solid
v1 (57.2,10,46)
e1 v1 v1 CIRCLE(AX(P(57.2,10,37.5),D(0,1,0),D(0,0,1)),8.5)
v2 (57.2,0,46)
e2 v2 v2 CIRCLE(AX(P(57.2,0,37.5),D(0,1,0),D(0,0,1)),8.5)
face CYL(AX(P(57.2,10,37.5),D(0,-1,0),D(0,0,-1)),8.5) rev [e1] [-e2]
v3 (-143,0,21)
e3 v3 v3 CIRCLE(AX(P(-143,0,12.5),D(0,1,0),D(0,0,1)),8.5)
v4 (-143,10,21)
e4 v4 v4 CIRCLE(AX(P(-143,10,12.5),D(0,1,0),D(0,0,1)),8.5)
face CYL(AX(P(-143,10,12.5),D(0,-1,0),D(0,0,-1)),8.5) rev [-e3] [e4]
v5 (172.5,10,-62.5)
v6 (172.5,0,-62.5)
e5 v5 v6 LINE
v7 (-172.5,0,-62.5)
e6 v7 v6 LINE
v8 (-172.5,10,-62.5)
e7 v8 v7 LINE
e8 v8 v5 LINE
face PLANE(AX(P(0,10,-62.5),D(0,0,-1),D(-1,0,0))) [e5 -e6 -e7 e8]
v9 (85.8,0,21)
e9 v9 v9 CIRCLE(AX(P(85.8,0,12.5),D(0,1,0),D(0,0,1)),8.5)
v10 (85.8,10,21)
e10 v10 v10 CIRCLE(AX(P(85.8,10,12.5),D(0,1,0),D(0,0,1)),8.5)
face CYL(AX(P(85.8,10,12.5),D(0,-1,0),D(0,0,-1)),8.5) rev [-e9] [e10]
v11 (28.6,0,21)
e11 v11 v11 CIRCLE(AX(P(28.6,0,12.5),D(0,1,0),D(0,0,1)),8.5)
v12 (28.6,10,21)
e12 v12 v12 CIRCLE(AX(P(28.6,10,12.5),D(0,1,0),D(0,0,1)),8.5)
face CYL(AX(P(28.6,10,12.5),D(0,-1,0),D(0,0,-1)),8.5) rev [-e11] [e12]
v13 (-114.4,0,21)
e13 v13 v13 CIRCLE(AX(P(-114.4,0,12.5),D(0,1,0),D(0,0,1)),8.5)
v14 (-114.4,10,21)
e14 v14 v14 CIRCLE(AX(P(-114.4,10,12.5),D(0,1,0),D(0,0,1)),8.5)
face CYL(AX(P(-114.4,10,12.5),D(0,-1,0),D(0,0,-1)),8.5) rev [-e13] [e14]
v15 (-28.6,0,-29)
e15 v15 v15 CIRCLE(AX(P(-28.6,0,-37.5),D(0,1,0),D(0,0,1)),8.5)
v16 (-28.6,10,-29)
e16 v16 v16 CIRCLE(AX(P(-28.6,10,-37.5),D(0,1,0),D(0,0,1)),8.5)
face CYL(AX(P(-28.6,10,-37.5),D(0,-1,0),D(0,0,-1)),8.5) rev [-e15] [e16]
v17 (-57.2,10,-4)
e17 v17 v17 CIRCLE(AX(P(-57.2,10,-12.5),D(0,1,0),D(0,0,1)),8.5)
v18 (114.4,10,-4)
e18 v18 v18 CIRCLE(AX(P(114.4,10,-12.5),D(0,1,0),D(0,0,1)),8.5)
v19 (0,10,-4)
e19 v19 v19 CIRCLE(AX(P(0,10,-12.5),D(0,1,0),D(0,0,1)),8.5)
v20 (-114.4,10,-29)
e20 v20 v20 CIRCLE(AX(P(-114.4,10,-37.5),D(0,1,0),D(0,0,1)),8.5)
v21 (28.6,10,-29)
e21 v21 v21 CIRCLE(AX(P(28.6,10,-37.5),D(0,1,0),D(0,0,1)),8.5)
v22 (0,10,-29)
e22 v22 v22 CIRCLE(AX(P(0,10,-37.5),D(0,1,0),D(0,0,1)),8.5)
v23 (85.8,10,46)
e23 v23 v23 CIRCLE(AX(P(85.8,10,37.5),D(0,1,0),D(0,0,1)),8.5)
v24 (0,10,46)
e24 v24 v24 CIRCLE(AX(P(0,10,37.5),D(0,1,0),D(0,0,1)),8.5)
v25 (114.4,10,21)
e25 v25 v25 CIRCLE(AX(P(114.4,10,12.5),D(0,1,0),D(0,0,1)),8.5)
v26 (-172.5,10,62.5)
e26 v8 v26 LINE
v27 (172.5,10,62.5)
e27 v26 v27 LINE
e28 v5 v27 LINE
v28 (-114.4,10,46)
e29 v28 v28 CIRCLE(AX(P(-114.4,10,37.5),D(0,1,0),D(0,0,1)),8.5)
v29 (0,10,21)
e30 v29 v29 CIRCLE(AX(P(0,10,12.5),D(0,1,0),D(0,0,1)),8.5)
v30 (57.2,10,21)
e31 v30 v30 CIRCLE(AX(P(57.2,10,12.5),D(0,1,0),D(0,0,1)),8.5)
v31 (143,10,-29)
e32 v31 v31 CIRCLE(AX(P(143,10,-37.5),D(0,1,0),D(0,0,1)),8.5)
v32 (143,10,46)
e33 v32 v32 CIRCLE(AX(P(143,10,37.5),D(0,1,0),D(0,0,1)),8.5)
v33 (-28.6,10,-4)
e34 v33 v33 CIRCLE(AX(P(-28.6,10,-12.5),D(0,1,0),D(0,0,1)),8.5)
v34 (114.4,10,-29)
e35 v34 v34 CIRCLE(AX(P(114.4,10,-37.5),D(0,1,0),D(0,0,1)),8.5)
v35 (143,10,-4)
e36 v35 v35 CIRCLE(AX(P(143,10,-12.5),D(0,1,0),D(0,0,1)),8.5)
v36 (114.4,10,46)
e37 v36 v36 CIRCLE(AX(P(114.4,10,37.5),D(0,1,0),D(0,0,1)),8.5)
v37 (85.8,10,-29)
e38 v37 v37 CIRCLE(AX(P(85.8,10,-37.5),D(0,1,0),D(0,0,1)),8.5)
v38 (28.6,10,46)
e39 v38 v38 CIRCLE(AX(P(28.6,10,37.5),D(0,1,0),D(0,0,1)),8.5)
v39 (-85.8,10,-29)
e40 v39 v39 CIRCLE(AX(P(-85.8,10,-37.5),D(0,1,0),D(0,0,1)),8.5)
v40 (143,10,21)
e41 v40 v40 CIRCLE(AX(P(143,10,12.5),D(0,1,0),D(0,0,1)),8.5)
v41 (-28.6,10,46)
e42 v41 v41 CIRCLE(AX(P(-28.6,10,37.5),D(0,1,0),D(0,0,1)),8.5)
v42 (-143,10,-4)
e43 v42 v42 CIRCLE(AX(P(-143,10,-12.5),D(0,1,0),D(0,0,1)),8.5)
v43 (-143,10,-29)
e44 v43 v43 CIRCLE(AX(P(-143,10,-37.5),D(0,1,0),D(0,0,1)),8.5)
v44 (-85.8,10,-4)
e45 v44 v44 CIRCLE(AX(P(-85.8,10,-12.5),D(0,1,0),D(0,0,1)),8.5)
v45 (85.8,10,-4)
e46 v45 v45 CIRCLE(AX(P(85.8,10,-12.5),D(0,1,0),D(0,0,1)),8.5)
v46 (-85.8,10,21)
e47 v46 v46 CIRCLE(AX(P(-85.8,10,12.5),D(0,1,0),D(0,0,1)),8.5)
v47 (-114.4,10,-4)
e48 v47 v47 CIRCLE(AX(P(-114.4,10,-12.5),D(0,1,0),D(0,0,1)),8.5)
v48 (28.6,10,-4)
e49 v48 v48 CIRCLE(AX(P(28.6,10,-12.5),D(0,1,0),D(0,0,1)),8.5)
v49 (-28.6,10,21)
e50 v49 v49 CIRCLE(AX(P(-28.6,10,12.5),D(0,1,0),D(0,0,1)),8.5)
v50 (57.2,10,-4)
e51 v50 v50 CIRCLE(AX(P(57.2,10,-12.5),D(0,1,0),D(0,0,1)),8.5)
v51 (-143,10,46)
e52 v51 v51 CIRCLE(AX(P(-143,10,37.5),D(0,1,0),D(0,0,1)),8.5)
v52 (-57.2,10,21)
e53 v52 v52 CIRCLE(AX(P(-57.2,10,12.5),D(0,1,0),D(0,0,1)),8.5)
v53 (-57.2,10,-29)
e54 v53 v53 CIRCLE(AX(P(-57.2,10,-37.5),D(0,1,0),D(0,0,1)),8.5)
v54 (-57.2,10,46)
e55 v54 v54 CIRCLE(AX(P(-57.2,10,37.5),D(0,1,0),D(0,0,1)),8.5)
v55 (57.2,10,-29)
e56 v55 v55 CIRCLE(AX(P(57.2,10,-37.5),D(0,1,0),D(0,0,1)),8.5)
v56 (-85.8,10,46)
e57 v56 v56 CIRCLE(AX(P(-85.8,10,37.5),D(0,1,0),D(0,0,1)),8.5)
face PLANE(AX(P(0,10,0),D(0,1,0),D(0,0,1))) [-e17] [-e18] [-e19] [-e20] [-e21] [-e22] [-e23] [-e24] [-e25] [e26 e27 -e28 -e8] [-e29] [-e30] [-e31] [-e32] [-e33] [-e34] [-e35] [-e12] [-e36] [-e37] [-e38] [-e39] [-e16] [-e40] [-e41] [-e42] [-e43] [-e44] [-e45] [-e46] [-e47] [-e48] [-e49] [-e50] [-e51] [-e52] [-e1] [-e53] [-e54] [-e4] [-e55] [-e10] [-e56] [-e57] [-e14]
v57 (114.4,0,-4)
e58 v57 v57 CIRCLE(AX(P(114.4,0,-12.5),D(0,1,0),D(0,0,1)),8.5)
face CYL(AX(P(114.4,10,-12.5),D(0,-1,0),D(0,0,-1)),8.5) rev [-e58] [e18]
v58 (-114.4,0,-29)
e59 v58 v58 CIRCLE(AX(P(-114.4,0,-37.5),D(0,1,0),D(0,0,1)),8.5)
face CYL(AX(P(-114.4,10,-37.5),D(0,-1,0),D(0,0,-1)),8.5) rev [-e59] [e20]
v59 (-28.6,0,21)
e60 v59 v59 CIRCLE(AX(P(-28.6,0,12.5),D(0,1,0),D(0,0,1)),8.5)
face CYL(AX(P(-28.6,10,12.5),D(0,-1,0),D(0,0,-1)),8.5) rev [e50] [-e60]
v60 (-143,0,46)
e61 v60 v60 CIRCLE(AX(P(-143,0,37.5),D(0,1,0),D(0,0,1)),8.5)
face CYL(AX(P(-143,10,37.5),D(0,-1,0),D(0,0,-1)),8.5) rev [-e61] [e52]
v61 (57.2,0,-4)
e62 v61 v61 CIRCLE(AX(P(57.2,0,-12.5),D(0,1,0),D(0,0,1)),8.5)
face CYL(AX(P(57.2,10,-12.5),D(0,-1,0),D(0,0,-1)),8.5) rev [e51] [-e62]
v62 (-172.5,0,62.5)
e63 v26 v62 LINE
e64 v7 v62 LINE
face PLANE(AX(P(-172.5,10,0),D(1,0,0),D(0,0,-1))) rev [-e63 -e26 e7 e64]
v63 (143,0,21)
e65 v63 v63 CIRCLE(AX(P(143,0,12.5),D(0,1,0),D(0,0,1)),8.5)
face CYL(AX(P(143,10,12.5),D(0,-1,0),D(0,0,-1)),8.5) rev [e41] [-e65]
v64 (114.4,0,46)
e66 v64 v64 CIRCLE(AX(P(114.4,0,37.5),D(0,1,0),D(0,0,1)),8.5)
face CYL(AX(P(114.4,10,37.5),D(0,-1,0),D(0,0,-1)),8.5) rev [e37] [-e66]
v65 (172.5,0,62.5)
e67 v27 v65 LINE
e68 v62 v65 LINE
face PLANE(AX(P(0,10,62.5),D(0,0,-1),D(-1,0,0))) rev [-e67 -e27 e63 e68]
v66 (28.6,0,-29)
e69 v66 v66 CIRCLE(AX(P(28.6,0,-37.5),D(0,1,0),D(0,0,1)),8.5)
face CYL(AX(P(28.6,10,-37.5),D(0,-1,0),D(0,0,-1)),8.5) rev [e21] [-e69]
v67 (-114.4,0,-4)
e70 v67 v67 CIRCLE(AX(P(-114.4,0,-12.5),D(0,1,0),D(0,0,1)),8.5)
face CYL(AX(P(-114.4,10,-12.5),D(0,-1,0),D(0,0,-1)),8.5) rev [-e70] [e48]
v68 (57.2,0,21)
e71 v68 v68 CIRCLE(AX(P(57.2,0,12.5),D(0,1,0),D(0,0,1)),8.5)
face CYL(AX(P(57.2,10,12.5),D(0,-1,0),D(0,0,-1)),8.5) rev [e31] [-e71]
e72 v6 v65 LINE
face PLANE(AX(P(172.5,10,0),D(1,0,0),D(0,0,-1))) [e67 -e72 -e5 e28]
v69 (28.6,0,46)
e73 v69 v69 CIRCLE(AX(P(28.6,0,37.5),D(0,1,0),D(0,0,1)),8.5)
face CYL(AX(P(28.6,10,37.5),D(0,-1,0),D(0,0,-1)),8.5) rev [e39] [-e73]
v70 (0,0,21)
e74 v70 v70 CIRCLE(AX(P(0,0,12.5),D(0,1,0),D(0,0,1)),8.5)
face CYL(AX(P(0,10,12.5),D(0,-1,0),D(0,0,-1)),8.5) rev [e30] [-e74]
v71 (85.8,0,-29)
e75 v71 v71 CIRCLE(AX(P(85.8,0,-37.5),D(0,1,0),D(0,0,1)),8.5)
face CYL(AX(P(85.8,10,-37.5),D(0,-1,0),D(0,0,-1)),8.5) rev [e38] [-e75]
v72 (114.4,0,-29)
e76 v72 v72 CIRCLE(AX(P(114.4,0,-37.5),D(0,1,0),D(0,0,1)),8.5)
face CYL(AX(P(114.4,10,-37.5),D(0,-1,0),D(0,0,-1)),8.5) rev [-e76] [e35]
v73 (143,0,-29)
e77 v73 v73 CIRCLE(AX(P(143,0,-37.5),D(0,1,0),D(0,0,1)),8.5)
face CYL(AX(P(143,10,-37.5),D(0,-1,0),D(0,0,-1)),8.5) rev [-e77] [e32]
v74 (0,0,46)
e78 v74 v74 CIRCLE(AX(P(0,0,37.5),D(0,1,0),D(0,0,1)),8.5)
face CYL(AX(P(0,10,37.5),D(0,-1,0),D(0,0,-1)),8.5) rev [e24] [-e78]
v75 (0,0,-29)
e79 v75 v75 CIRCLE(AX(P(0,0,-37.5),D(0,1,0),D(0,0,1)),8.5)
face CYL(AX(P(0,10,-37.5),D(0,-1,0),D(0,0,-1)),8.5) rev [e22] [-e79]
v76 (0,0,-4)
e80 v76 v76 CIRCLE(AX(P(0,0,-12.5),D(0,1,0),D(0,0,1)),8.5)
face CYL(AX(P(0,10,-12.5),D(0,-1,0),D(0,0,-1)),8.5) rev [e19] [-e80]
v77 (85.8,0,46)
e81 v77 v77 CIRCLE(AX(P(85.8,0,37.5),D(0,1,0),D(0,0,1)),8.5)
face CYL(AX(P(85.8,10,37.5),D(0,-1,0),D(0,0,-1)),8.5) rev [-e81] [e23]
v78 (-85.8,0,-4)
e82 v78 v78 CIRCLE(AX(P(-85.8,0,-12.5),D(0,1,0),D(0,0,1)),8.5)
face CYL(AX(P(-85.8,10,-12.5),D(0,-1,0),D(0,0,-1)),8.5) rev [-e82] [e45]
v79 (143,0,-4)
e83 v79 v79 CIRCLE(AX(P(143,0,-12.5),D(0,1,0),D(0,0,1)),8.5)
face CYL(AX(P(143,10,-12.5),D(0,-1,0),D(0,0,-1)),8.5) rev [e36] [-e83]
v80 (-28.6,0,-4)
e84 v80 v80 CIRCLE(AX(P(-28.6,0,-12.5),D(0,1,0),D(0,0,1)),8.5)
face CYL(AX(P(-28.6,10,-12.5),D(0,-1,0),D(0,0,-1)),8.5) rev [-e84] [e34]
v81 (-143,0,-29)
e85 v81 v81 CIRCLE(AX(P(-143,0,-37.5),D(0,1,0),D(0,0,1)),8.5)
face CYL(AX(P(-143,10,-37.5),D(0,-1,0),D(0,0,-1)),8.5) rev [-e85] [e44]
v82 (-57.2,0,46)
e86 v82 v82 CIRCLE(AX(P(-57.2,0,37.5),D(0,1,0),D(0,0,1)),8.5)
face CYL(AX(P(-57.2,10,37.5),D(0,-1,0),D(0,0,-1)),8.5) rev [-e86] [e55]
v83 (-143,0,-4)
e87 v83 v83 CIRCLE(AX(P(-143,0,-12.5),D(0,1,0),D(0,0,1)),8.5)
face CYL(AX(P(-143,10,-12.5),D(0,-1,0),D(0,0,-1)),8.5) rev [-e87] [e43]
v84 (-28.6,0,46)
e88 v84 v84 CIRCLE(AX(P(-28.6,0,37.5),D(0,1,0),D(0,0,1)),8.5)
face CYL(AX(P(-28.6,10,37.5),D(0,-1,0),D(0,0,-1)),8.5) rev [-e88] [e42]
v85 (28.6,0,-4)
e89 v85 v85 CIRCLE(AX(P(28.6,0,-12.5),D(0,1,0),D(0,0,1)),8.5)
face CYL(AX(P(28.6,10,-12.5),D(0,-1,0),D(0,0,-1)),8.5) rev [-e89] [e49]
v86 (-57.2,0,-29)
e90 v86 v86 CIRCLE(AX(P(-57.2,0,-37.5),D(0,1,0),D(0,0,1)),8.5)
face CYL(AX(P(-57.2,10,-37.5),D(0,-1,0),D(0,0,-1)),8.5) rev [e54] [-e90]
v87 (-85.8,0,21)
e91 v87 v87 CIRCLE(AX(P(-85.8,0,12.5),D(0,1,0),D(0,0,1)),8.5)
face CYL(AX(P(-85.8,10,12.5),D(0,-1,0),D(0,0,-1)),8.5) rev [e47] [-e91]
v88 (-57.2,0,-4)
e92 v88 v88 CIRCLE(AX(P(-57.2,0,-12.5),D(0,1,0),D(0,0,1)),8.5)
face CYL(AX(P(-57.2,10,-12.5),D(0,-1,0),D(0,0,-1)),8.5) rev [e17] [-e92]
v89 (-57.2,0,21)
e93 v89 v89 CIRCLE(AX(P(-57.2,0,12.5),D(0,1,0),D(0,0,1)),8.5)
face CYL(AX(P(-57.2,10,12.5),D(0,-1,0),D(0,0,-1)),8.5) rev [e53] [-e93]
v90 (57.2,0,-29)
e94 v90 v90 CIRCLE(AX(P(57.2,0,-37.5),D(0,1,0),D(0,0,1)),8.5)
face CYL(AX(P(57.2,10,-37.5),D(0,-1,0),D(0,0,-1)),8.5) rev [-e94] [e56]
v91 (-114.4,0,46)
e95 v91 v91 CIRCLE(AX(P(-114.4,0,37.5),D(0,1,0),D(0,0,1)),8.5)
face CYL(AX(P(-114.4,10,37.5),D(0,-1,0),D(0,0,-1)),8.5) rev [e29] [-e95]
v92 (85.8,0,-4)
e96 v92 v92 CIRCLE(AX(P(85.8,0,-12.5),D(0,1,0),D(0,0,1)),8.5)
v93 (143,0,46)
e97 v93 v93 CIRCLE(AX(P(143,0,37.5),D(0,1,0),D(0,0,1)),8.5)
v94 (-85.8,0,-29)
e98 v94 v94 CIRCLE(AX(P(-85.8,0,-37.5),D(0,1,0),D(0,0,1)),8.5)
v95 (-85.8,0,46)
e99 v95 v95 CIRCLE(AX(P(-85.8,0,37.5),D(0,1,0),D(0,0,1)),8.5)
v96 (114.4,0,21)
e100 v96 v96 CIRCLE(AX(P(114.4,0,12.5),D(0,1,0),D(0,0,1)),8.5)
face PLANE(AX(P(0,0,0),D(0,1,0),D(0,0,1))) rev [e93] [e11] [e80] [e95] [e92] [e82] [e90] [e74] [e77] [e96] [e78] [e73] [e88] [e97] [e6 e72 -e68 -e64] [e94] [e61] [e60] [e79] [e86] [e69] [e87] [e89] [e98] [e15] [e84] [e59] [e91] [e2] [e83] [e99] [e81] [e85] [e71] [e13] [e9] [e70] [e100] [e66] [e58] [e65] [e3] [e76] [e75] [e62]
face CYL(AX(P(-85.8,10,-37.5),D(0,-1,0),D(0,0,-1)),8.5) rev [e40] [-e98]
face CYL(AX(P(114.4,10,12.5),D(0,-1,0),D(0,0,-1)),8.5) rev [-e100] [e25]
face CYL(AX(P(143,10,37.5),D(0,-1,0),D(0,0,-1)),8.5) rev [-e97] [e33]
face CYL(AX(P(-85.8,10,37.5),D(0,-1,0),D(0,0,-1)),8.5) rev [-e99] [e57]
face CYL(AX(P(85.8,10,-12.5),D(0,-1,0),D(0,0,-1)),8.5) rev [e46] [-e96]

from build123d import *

# Parameters (mm, degrees)
SKETCH1_W             = 345
SKETCH1_H             = 125
SKETCH1_R             = 8.5
BOSS_EXTRUDE1_DEPTH   = 10
SKETCH1_3_R           = 8.5
CUT_EXTRUDE1_DEPTH    = 184.74574825
CRVPATTERN1_OUTLINE_R = 8.5
CRVPATTERN1_DEPTH     = 10


# Read off the part's stored shape, not the designer's step: CrvPattern1
with BuildPart() as part:
    # Sketch1 → Boss-Extrude1 (new body)
    # profile 1 of 2: a face of its own
    with BuildSketch(Plane(origin=(0, 0, 0), x_dir=(1, 0, 0), z_dir=(0, 1, 0))):
        Rectangle(SKETCH1_W, SKETCH1_H)
        with Locations((-143, 37.5)):
            Circle(SKETCH1_R, mode=Mode.SUBTRACT)
    # profile 2 of 2: a face of its own
    with BuildSketch(Plane(origin=(0, 0, 0), x_dir=(1, 0, 0), z_dir=(0, 1, 0))):
        with Locations((-143, 37.5)):
            Circle(SKETCH1_R)
    extrude(amount=BOSS_EXTRUDE1_DEPTH)

    # Sketch1<3> → Cut-Extrude1 (cut, through all)
    with BuildSketch(Plane(origin=(0, 0, 0), x_dir=(1, 0, 0), z_dir=(0, 1, 0))):
        with Locations(Location((-143, 37.5, 0), (0, 0, 270))):
            Circle(SKETCH1_3_R)
    extrude(amount=CUT_EXTRUDE1_DEPTH, mode=Mode.SUBTRACT)

    # CrvPattern1 outline → CrvPattern1 (cut)
    with BuildSketch(Plane(origin=(0, 0, 0), x_dir=(1, 0, 0), z_dir=(0, 1, 0))):
        with Locations((-143, 12.5)):
            Circle(CRVPATTERN1_OUTLINE_R)
        with Locations((143, 12.5)):
            Circle(CRVPATTERN1_OUTLINE_R)
        with Locations((143, 37.5)):
            Circle(CRVPATTERN1_OUTLINE_R)
        with Locations((114.4, -37.5)):
            Circle(CRVPATTERN1_OUTLINE_R)
        with Locations((114.4, -12.5)):
            Circle(CRVPATTERN1_OUTLINE_R)
        with Locations((114.4, 12.5)):
            Circle(CRVPATTERN1_OUTLINE_R)
        with Locations((114.4, 37.5)):
            Circle(CRVPATTERN1_OUTLINE_R)
        with Locations((85.8, -37.5)):
            Circle(CRVPATTERN1_OUTLINE_R)
        with Locations((85.8, -12.5)):
            Circle(CRVPATTERN1_OUTLINE_R)
        with Locations((143, -12.5)):
            Circle(CRVPATTERN1_OUTLINE_R)
        with Locations((143, -37.5)):
            Circle(CRVPATTERN1_OUTLINE_R)
        with Locations((-85.8, -12.5)):
            Circle(CRVPATTERN1_OUTLINE_R)
        with Locations((-85.8, -37.5)):
            Circle(CRVPATTERN1_OUTLINE_R)
        with Locations((-57.2, 37.5)):
            Circle(CRVPATTERN1_OUTLINE_R)
        with Locations((-57.2, 12.5)):
            Circle(CRVPATTERN1_OUTLINE_R)
        with Locations((-57.2, -12.5)):
            Circle(CRVPATTERN1_OUTLINE_R)
        with Locations((-57.2, -37.5)):
            Circle(CRVPATTERN1_OUTLINE_R)
        with Locations((-28.6, 37.5)):
            Circle(CRVPATTERN1_OUTLINE_R)
        with Locations((-28.6, 12.5)):
            Circle(CRVPATTERN1_OUTLINE_R)
        with Locations((-143, -12.5)):
            Circle(CRVPATTERN1_OUTLINE_R)
        with Locations((-143, -37.5)):
            Circle(CRVPATTERN1_OUTLINE_R)
        with Locations((-114.4, 37.5)):
            Circle(CRVPATTERN1_OUTLINE_R)
        with Locations((-114.4, 12.5)):
            Circle(CRVPATTERN1_OUTLINE_R)
        with Locations((-114.4, -12.5)):
            Circle(CRVPATTERN1_OUTLINE_R)
        with Locations((-114.4, -37.5)):
            Circle(CRVPATTERN1_OUTLINE_R)
        with Locations((-85.8, 37.5)):
            Circle(CRVPATTERN1_OUTLINE_R)
        with Locations((-85.8, 12.5)):
            Circle(CRVPATTERN1_OUTLINE_R)
        with Locations((28.6, -12.5)):
            Circle(CRVPATTERN1_OUTLINE_R)
        with Locations((28.6, -37.5)):
            Circle(CRVPATTERN1_OUTLINE_R)
        with Locations((57.2, 37.5)):
            Circle(CRVPATTERN1_OUTLINE_R)
        with Locations((57.2, 12.5)):
            Circle(CRVPATTERN1_OUTLINE_R)
        with Locations((57.2, -12.5)):
            Circle(CRVPATTERN1_OUTLINE_R)
        with Locations((57.2, -37.5)):
            Circle(CRVPATTERN1_OUTLINE_R)
        with Locations((85.8, 37.5)):
            Circle(CRVPATTERN1_OUTLINE_R)
        with Locations((85.8, 12.5)):
            Circle(CRVPATTERN1_OUTLINE_R)
        with Locations((-28.6, -12.5)):
            Circle(CRVPATTERN1_OUTLINE_R)
        with Locations((-28.6, -37.5)):
            Circle(CRVPATTERN1_OUTLINE_R)
        with Locations((0, 37.5)):
            Circle(CRVPATTERN1_OUTLINE_R)
        with Locations((0, 12.5)):
            Circle(CRVPATTERN1_OUTLINE_R)
        with Locations((0, -12.5)):
            Circle(CRVPATTERN1_OUTLINE_R)
        with Locations((0, -37.5)):
            Circle(CRVPATTERN1_OUTLINE_R)
        with Locations((28.6, 37.5)):
            Circle(CRVPATTERN1_OUTLINE_R)
        with Locations((28.6, 12.5)):
            Circle(CRVPATTERN1_OUTLINE_R)
    extrude(amount=CRVPATTERN1_DEPTH, mode=Mode.SUBTRACT)


solid = part.part
